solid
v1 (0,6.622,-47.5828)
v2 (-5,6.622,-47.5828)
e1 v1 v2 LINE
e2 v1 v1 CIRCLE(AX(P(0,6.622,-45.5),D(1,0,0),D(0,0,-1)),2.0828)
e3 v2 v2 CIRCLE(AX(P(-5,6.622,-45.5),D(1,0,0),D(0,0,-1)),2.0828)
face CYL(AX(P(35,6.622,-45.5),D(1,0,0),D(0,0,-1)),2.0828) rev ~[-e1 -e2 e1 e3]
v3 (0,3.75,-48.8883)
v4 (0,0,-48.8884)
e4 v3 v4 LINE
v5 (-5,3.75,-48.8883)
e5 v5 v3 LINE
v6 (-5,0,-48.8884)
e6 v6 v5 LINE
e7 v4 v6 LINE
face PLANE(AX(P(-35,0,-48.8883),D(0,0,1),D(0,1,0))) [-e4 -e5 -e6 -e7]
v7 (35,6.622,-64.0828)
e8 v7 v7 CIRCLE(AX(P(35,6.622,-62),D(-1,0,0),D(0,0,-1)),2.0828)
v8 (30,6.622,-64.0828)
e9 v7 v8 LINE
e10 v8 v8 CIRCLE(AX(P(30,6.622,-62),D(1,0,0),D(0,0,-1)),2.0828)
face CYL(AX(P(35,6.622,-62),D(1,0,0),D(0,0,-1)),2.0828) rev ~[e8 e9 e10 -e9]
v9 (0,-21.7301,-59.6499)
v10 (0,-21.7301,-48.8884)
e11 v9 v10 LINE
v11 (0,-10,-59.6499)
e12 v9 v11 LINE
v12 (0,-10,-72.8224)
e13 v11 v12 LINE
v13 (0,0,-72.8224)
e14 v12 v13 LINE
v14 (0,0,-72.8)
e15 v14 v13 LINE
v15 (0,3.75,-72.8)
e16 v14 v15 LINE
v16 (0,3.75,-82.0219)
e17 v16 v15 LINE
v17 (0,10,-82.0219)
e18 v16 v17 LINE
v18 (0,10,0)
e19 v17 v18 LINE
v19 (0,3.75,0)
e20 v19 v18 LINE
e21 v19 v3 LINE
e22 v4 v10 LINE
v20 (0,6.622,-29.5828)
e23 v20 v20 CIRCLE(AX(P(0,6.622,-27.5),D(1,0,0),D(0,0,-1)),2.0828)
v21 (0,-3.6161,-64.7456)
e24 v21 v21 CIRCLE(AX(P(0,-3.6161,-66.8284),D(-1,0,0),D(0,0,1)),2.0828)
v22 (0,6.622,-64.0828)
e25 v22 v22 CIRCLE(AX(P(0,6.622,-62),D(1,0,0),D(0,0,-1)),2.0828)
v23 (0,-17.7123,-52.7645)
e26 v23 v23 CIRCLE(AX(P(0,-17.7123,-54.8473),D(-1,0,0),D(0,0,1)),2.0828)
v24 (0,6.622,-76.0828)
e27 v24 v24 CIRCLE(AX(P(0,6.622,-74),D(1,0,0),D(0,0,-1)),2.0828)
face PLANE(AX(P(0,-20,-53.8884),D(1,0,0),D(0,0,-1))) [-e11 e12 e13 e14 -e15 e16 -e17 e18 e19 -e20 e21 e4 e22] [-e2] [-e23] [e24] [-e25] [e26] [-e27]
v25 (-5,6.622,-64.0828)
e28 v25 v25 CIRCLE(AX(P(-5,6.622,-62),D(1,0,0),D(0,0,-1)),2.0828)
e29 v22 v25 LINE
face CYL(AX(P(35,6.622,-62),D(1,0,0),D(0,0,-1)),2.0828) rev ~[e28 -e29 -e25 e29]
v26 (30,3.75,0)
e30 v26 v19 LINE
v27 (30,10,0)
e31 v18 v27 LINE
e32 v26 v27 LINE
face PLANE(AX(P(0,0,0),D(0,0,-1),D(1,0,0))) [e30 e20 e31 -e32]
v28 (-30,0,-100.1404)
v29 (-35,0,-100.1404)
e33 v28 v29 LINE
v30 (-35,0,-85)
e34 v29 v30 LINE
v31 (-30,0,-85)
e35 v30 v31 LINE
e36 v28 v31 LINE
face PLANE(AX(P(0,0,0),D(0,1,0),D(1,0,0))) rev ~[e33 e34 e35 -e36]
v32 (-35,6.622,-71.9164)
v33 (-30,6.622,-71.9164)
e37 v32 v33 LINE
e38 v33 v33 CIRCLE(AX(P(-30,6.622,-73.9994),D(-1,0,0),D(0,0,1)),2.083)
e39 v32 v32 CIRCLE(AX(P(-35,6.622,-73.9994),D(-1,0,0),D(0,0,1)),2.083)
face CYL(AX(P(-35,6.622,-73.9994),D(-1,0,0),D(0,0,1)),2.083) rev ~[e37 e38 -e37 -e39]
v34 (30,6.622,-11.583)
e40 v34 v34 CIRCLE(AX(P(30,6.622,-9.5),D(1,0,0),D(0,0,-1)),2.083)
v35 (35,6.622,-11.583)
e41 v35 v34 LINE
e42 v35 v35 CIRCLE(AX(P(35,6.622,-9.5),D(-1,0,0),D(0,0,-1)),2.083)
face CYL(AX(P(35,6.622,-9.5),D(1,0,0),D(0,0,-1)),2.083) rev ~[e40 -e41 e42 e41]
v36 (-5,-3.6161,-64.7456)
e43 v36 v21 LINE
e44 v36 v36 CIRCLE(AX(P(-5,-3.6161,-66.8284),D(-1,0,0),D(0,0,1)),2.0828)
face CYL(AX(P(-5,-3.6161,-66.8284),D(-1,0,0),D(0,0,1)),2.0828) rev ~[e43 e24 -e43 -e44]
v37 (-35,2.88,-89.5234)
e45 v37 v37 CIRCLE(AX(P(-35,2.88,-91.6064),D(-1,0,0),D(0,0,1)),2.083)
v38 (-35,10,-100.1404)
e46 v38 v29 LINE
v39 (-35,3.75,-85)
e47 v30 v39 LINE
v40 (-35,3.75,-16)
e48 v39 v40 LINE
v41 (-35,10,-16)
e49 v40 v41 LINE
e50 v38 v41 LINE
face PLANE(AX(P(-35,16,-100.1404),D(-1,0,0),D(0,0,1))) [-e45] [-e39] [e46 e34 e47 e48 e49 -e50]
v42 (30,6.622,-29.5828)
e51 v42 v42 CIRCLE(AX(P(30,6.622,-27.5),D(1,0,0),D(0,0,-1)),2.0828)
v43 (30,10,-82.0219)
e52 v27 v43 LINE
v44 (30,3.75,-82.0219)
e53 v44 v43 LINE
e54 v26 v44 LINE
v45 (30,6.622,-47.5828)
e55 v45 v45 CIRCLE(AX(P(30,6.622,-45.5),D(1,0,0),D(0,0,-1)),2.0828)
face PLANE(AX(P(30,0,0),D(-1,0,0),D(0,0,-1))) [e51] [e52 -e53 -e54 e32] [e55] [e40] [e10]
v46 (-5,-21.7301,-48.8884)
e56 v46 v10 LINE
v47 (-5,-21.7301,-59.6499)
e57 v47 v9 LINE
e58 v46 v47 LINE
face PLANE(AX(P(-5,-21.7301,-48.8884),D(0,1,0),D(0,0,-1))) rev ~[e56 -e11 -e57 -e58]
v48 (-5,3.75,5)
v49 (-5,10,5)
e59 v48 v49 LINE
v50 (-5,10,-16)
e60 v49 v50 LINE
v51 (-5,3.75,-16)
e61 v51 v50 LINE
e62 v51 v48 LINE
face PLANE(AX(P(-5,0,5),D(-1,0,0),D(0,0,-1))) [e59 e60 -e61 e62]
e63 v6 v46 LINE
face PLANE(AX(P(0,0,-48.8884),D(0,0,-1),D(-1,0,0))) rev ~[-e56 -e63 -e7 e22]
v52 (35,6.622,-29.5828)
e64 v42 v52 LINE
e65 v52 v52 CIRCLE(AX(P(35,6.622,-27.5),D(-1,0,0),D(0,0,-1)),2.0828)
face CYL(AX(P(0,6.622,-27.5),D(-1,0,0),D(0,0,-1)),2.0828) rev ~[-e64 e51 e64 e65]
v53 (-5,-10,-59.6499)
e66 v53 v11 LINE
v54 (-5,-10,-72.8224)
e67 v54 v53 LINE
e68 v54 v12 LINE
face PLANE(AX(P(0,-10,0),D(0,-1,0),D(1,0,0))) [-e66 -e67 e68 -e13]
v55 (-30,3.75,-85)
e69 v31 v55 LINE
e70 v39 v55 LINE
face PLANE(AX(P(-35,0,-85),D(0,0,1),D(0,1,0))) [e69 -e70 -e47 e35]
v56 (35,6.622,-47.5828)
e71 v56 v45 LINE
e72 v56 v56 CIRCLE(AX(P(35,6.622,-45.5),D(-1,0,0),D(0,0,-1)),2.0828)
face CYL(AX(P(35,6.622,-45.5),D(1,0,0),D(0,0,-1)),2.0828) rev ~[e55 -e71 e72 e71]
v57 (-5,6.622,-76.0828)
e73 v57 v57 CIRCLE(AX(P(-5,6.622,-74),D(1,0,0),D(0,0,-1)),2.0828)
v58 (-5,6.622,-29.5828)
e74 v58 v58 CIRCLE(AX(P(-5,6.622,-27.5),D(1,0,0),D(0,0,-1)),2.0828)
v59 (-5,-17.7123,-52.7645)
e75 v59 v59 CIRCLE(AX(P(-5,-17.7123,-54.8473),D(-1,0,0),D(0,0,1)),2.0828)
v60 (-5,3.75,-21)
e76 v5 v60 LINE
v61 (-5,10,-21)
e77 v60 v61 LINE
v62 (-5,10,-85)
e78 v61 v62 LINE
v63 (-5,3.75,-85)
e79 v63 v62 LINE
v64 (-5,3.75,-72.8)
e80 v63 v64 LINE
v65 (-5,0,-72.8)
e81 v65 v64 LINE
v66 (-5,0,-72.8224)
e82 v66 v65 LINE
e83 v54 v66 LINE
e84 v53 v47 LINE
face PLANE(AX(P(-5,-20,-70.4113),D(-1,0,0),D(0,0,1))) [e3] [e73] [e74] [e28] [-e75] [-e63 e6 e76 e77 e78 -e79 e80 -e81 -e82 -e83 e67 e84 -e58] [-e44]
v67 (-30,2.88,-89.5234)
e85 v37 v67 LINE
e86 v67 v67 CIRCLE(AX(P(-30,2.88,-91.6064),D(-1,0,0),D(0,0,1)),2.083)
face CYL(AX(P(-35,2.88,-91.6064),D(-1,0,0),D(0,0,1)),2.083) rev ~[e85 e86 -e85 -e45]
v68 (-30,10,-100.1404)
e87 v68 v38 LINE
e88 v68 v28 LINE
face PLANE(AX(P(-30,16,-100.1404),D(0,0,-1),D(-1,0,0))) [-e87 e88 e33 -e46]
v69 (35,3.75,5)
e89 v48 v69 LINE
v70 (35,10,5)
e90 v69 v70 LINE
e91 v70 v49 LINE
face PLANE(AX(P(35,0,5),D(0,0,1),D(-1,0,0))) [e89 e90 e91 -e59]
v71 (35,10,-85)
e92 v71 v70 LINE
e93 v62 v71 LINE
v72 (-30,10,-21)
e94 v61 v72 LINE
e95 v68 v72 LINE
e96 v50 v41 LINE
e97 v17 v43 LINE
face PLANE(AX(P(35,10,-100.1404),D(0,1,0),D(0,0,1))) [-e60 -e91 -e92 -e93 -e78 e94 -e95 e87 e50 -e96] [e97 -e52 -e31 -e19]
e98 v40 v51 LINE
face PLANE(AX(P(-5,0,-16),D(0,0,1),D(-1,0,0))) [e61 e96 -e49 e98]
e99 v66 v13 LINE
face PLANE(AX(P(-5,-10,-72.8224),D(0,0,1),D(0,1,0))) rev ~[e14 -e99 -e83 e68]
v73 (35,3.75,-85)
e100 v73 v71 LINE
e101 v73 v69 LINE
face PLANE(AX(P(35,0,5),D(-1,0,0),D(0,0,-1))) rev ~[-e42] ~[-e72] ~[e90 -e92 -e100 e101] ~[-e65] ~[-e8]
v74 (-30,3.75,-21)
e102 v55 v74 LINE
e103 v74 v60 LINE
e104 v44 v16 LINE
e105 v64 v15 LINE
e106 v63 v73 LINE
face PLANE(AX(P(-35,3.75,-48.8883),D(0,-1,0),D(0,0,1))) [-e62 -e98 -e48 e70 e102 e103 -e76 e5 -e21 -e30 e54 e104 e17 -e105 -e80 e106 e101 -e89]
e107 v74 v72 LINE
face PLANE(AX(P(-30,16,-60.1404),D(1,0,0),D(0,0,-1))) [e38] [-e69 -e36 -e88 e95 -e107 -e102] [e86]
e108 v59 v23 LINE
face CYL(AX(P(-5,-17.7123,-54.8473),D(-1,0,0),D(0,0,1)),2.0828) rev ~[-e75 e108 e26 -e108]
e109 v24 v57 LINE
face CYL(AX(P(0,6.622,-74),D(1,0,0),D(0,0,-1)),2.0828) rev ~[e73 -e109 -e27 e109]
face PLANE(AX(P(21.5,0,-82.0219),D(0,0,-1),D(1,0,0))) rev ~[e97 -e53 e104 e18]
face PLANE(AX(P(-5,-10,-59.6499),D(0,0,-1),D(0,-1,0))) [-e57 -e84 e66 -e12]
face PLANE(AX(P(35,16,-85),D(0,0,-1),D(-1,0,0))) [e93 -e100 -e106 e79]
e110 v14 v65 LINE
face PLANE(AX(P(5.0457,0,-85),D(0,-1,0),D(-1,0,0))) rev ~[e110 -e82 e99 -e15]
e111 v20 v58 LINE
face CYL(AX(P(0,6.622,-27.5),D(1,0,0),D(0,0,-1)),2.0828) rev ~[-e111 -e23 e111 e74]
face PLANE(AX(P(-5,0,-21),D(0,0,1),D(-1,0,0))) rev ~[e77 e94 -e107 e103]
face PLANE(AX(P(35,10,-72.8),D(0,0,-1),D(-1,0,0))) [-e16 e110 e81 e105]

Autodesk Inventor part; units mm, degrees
ref_plane "YZ Plane" through (0, 0, 0) normal (1, 0, 0) x (0, 1, 0)
ref_plane "XZ Plane" through (0, 0, 0) normal (0, 1, 0) x (-1, 0, 0)
ref_plane "XY Plane" through (0, 0, 0) normal (0, 0, 1) x (1, 0, 0)
sketch "Sketch1" plane through (0, 0, 0) normal (0, 1, 0) x (-1, 0, 0)
  line L0 (0, 0) -> (-30, 0)
  line L1 (-30, 0) -> (-30, -80)
  line L2 (0, 0) -> (0, -21)
  line L3 (0, -21) -> (30, -21)
  line L4 (30, -21) -> (30, -80)
  line L5 (30, -80) -> (30, -112)
  line L6 (30, -112) -> (8.74, -112)
  line L7 (8.74, -112) -> (8.74, -80)
  line L8 (8.74, -80) -> (-30, -80)
  line L9 (-35, 5) -> (-35, -85)
  line L10 (-35, -85) -> (3.74, -85)
  line L11 (3.74, -85) -> (3.74, -117)
  line L12 (-35, 5) -> (5, 5)
  line L13 (5, 5) -> (5, -16)
  line L14 (5, -16) -> (35, -16)
  line L15 (35, -16) -> (35, -117)
  line L16 (35, -117) -> (3.74, -117)
  line L17 (0, -21) -> (5, -21)
  line L18 (0, -21) -> (5, -21)
  line L19 (5, -21) -> (5, -80)
  line L20 (0, -21) -> (0, -80)
  dimension "d0" = 30
  dimension "d2" = 21
  dimension "d3" = 30
  dimension "d4" = 59
  dimension "d5" = 32
  dimension "d6" = 21.26
  dimension "d9" = 90
  dimension "d10" = 38.74
  dimension "d11" = 32
  dimension "d12" = 40
  dimension "d13" = 21
  dimension "d14" = 30
extrude "Extrusion1" add sketch "Sketch1" along normal blind 16 contours L3 L19 L8 L20 | L12 L13 L14 L15 L16 L11 L10 L9
sketch "Sketch2" plane through (0, 16, 0) normal (0, 1, 0) x (1, 0, 0)
  line L0 (35, -5) -> (35, 85) projected
  line L1 (35, 85) -> (-46.5269, 85)
  line L2 (-46.5269, 85) -> (-46.5269, 122.3541)
  line L3 (-46.5269, 122.3541) -> (35, 122.3541)
  line L4 (35, 122.3541) -> (35, 85)
  point P0 (0, 0)
extrude "Extrusion2" cut sketch "Sketch2" against normal blind 16
sketch "Sketch3" plane through (0, 16, 0) normal (0, 1, 0) x (1, 0, 0)
  line L0 (-5, 21) -> (-5, 80) projected
  line L1 (-5, 78.0031) -> (-14.0245, 78.0031)
  line L2 (-14.0245, 78.0031) -> (-14.0245, 94.0311)
  line L3 (-14.0245, 94.0311) -> (-5, 94.0311)
  line L4 (-5, 94.0311) -> (-5, 78.0031)
  point P0 (0, 0)
extrude "Extrusion3" cut sketch "Sketch3" against normal blind 16
sketch "Sketch5" plane through (35, 0, 5) normal (1, 0, 0) x (0, 0, -1)
  line L0 (0, 0) -> (90, 0) projected
  line L1 (0, 0) -> (9.5, 0)
  line L2 (9.5, 0) -> (9.5, 6.622)
  line L3 (9.5, 0) -> (14.5, 0)
  line L4 (14.5, 0) -> (14.5, 6.622)
  circle A0 centre (14.5, 6.622) radius 2.083
  point P0 (5, 0)
  dimension "d21" = 9.5
  dimension "d23" = 5
  dimension "d24" = 6.622
  dimension "d25" = 4.166
extrude "Extrusion4" cut sketch "Sketch5" against normal blind 16
sketch "Sketch6" plane through (0, 0, -80) normal (1, 0, 0) x (0, 0, -1)
  circle A0 centre (-70.5, 6.622) radius 2.083 projected
  line L0 (-70.5, 6.622) -> (-52.5, 6.622)
  circle A1 centre (-52.5, 6.622) radius 2.0828
  point P0 (-80, 0)
  dimension "d29" = 18
  dimension "d30" = 4.1656
extrude "Extrusion5" cut sketch "Sketch6" along normal blind 50 and the other way blind 25 contours A1
sketch "Sketch7" plane through (35, 0, 5) normal (1, 0, 0) x (0, 0, -1)
  circle A0 centre (32.5, 6.622) radius 2.0828 projected
  line L0 (32.5, 6.622) -> (50.5, 6.622)
  line L1 (50.5, 6.622) -> (67, 6.622)
  circle A1 centre (50.5, 6.622) radius 2.0828
  circle A2 centre (67, 6.622) radius 2.0828
  point P0 (5, 0)
  dimension "d37" = 18
  dimension "d38" = 16.5
  dimension "d39" = 4.1656
  dimension "d40" = 4.1656
extrude "Extrusion6" cut sketch "Sketch7" against normal blind 50 contours A1 L1 L0 | L0 L1 A1 | A2
sketch "Sketch9" plane through (0, 0, -80) normal (1, 0, 0) x (0, 0, -1)
  circle A0 centre (-18, 6.622) radius 2.0828 projected
  line L0 (-18, 6.622) -> (-6, 6.622)
  circle A1 centre (-6, 6.622) radius 2.0828
  point P0 (-80, 0)
  dimension "d43" = 12
  dimension "d44" = 4.1656
extrude "Extrusion7" cut sketch "Sketch9" against normal blind 10 contours A1
sketch "Sketch10" plane through (0, 0, 0) normal (0, -1, 0) x (1, 0, 0)
  line L0 (0, -80.0219) -> (8.5, -80.0219)
  line L1 (8.5, -80.0219) -> (8.5, -82.0219)
  line L2 (8.5, -82.0219) -> (0, -82.0219)
  line L3 (0, -82.0219) -> (0, -80.0219)
  line L4 (8.5, -80.0219) -> (11.5, -80.0219)
  line L5 (11.5, -80.0219) -> (11.5, -82.0219)
  line L6 (11.5, -82.0219) -> (8.5, -82.0219)
  line L7 (8.5, -82.0219) -> (8.5, -80.0219)
  line L8 (8.5, -80.0219) -> (11.5, -80.0219)
  line L9 (11.5, -80.0219) -> (11.5, -75.0982)
  line L10 (11.5, -75.0982) -> (8.5, -75.0982)
  line L11 (8.5, -75.0982) -> (8.5, -80.0219)
  line L12 (30, 0) -> (30, -80) projected
  line L13 (30, -80) -> (21.5, -80)
  line L14 (21.5, -80) -> (21.5, -82.0219)
  line L15 (21.5, -82.0219) -> (30, -82.0219)
  line L16 (30, -82.0219) -> (30, -80)
  line L17 (21.5, -82.0219) -> (17, -82.0219)
  line L18 (17, -82.0219) -> (17, -71.2839)
  line L19 (17, -71.2839) -> (21.5, -71.2839)
  line L20 (21.5, -71.2839) -> (21.5, -82.0219)
  point P0 (0, 0)
  dimension "d47" = 8.5
  dimension "d48" = 2
  dimension "d49" = 3
  dimension "d50" = 8.5
  dimension "d51" = 4.5
extrude "Extrusion8" cut sketch "Sketch10" against normal blind 100 contours L14 L17 L18 L19 L20
sketch "Sketch11" plane through (0, 16, 0) normal (0, 1, 0) x (1, 0, 0)
  line L0 (-38.388, 86.2009) -> (-26.8829, 86.2009)
  line L1 (-26.8829, 86.2009) -> (-26.8829, 63.045)
  line L2 (-26.8829, 63.045) -> (-38.388, 63.045)
  line L3 (-38.388, 63.045) -> (-38.388, 86.2009)
  point P0 (0, 0)
extrude "Extrusion9" cut sketch "Sketch11" against normal blind 100
sketch "Sketch12" plane through (0, 0, 0) normal (0, -1, 0) x (1, 0, 0)
  line L0 (17, -80) -> (0, -80) projected
  line L1 (17, -82.0219) -> (17, -80)
  line L2 (17, -80) -> (0, -80)
  line L3 (0, -80) -> (0, -82.0219)
  line L4 (21.5, -82.0219) -> (17, -82.0219) projected
  line L5 (0, -82.0219) -> (17, -82.0219)
  point P0 (0, 0)
extrude "Extrusion10" cut sketch "Sketch12" against normal blind 16000
sketch "Sketch13" plane through (0, 0, 0) normal (0, -1, 0) x (1, 0, 0)
  line L0 (30, -80) -> (21.5, -80) projected
  line L1 (30, -80) -> (21.5, -80)
  line L2 (21.5, -80) -> (21.5, -82.0219) projected
  line L3 (21.5, -80) -> (21.5, -82.0219)
  line L4 (21.5, -82.0219) -> (30, -82.0219)
  line L5 (30, -82.0219) -> (30, -80)
  point P0 (0, 0)
extrude "Extrusion11" cut sketch "Sketch13" against normal blind 16000
sketch "Sketch14" plane through (0, 0, 0) normal (0, -1, 0) x (1, 0, 0)
  line L0 (-37.2661, -60.1404) -> (-28.1164, -60.1404)
  line L1 (-28.1164, -60.1404) -> (-28.1164, -64.2388)
  line L2 (-28.1164, -64.2388) -> (-37.2661, -64.2388)
  line L3 (-37.2661, -64.2388) -> (-37.2661, -60.1404)
  point P0 (0, 0)
extrude "Extrusion12" cut sketch "Sketch14" against normal blind 10000
sketch "Sketch15" plane through (0, 0, 0) normal (0, -1, 0) x (1, 0, 0)
  line L0 (-5, -85) -> (-5, -21) projected
  line L1 (0, 0) -> (0, -82.0219) projected
  line L2 (-5, -47.0884) -> (0, -47.0884)
  line L3 (0, -47.0884) -> (0, -60.3662)
  line L4 (0, -60.3662) -> (-5, -60.3662)
  line L5 (-5, -60.3662) -> (-5, -47.0884)
extrude "Extrusion13" add sketch "Sketch15" along normal blind 10
sketch "Sketch16" plane through (0, -10, 0) normal (0, -1, 0) x (1, 0, 0)
  line L0 (0, -47.0884) -> (-5, -47.0884) projected
  line L1 (0, 0) -> (0, -82.0219) projected
  line L2 (-5, -47.0884) -> (0, -47.0884)
  line L3 (0, -47.0884) -> (0, -53.8884)
  line L4 (0, -53.8884) -> (-5, -53.8884)
  line L5 (-5, -53.8884) -> (-5, -47.0884)
  line L6 (0, -82.0219) -> (0, -60.3662) projected
  line L7 (-5, -53.8884) -> (0, -53.8884)
  line L8 (0, -53.8884) -> (0, -68.0271)
  line L9 (0, -68.0271) -> (-5, -68.0271)
  line L10 (-5, -68.0271) -> (-5, -53.8884)
  dimension "d64" = 6.8
extrude "Extrusion14" add sketch "Sketch16" along normal mid plane 20 contours L1 L9 L10 L4
sketch "Sketch17" plane through (0, -10, 0) normal (0, -1, 0) x (1, 0, 0)
  line L0 (0, -47.0884) -> (-5, -47.0884) projected
  line L1 (0, -53.8884) -> (0, -47.0884) projected
  line L2 (-5, -47.0884) -> (0, -47.0884)
  line L3 (0, -47.0884) -> (0, -53.8884)
  line L4 (0, -53.8884) -> (-5, -53.8884)
  line L5 (-5, -53.8884) -> (-5, -47.0884)
  point P0 (0, 0)
extrude "Extrusion15" cut sketch "Sketch17" against normal blind 10
sketch "Sketch18" plane through (0, -20, 0) normal (0, -1, 0) x (1, 0, 0)
  line L0 (-5, -53.8884) -> (-5, -68.0271) projected
  line L1 (0, -71.9172) -> (0, -76.0828) projected
  line L2 (-5, -68.0271) -> (0, -68.0271)
  line L3 (0, -68.0271) -> (0, -76.0828)
  line L4 (0, -76.0828) -> (-5, -76.0828)
  line L5 (-5, -76.0828) -> (-5, -68.0271)
  point P0 (0, 0)
extrude "Extrusion16" add sketch "Sketch18" against normal blind 20
sketch "Sketch19" plane through (0, -20, 0) normal (0, -1, 0) x (1, 0, 0)
  line L0 (-5, -76.0828) -> (-5, -85) projected
  line L1 (0, -53.8884) -> (0, -76.0828) projected
  line L2 (-5, -76.0828) -> (0, -76.0828)
  line L3 (0, -76.0828) -> (0, -70.4113)
  line L4 (0, -70.4113) -> (-5, -70.4113)
  line L5 (-5, -70.4113) -> (-5, -76.0828)
  point P0 (0, 0)
extrude "Extrusion17" cut sketch "Sketch19" against normal blind 10
sketch "Sketch20" plane through (-5, 0, -21) normal (-1, 0, 0) x (0, 0, 1)
  line L0 (-55.0828, -10) -> (-49.4113, -10) projected
  line L1 (21, 0) -> (-61.0219, 0) projected
  line L2 (-55.0828, -10) -> (-51.8224, -10)
  line L3 (-51.8224, -10) -> (-51.8224, 0)
  line L4 (-51.8224, 0) -> (-55.0828, 0)
  line L5 (-55.0828, 0) -> (-55.0828, -10)
extrude "Extrusion18" cut sketch "Sketch20" against normal blind 10
sketch "Sketch21" plane through (-5, 0, -21) normal (-1, 0, 0) x (0, 0, 1)
  circle A0 centre (-53, 6.622) radius 2.0828 projected
  line L0 (-53, 6.622) -> (-45.8284, -3.6161)
  circle A1 centre (-45.8284, -3.6161) radius 2.0828
  point P0 (21, 0)
  dimension "d75" = 12.5
  dimension "d76" = 4.1656
extrude "Extrusion19" cut sketch "Sketch21" against normal blind 20 contours A1
sketch "Sketch22" plane through (-5, 0, -21) normal (-1, 0, 0) x (0, 0, 1)
  circle A0 centre (-45.8284, -3.6161) radius 2.0828 projected
  line L0 (-45.8284, -3.6161) -> (-33.8473, -17.7123)
  circle A1 centre (-33.8473, -17.7123) radius 2.0828
  point P0 (21, 0)
  dimension "d79" = 18.5
  dimension "d86" = 4.1656
sketch "Sketch23" plane through (0, 0, 0) normal (0, -1, 0) x (1, 0, 0)
  line L0 (-5, -53.8884) -> (0, -53.8884)
  line L1 (0, -53.8884) -> (0, -48.8884)
  line L2 (0, -48.8884) -> (-5, -48.8884)
  line L3 (-5, -48.8884) -> (-5, -53.8884)
  point P0 (0, 0)
  dimension "d80" = 5
  dimension "d81" = 5
extrude "Extrusion20" add sketch "Sketch23" along normal blind 24
sketch "Sketch24" plane through (0, -20, 0) normal (0, -1, 0) x (1, 0, 0)
  line L0 (0, -53.8884) -> (-5, -53.8884) projected
  line L1 (-5, -70.4113) -> (0, -70.4113) projected
  line L2 (-5, -53.8884) -> (0, -53.8884)
  line L3 (0, -53.8884) -> (0, -70.4113)
  line L4 (0, -70.4113) -> (-5, -70.4113)
  line L5 (-5, -70.4113) -> (-5, -53.8884)
  point P0 (0, 0)
extrude "Extrusion21" add sketch "Sketch24" along normal blind 4
extrude "Extrusion22" cut sketch "Sketch22" against normal blind 10 contours A1
sketch "Sketch25" plane through (-5, 0, -21) normal (-1, 0, 0) x (0, 0, 1)
  line L0 (-49.4113, -10) -> (-49.4113, -24) projected
  line L1 (-27.8884, 0) -> (-27.8884, -24) projected
  line L2 (-49.4113, -24) -> (-27.8884, -24)
  line L3 (-27.8884, -24) -> (-27.8884, -21.7301)
  line L4 (-27.8884, -21.7301) -> (-49.4113, -21.7301)
  line L5 (-49.4113, -21.7301) -> (-49.4113, -24)
  point P0 (21, 0)
extrude "Extrusion23" cut sketch "Sketch25" against normal blind 10
sketch "Sketch26" plane through (0, 16, 0) normal (0, 1, 0) x (1, 0, 0)
  line L0 (-35, 60.1404) -> (-30, 60.1404) projected
  line L1 (-35, 60.1404) -> (-30, 60.1404)
  line L2 (-30, 60.1404) -> (-30, 100.1404)
  line L3 (-30, 100.1404) -> (-35, 100.1404)
  line L4 (-35, 100.1404) -> (-35, 60.1404)
  point P0 (0, 0)
  dimension "d91" = 40
extrude "Extrusion24" add sketch "Sketch26" against normal blind 16
sketch "Sketch29" plane through (35, 0, 5) normal (1, 0, 0) x (0, 0, -1)
  line L0 (0, 16) -> (90, 16) projected
  line L1 (105.1404, 16) -> (105.1404, 0) projected
  line L2 (0, 16) -> (105.1404, 16)
  line L3 (105.1404, 16) -> (105.1404, 10)
  line L4 (105.1404, 10) -> (0, 10)
  line L5 (0, 10) -> (0, 16)
  line L6 (0, 0) -> (90, 0) projected
  point P0 (5, 0)
  dimension "d101" = 10
extrude "Extrusion27" cut sketch "Sketch29" against normal blind 70
sketch "Sketch30" plane through (-35, 0, -100.1404) normal (-1, 0, 0) x (0, 0, 1)
  line L0 (105.1404, 0) -> (15.1404, 0) projected
  line L1 (105.1404, 0) -> (51.2521, 0)
  line L2 (51.2521, 0) -> (51.2521, 3.75)
  line L3 (51.2521, 3.75) -> (105.1404, 3.75)
  line L4 (105.1404, 3.75) -> (105.1404, 0)
  line L5 (51.2521, 0) -> (51.2521, -21.7301) projected
  point P0 (100.1404, 0)
  dimension "d104" = 3.75
  dimension "d115" = 0
extrude "Extrusion28" cut sketch "Sketch30" against normal blind 70
sketch "Sketch31" plane through (35, 0, -85) normal (1, 0, 0) x (0, 0, -1)
  line L0 (-36.1116, 3.75) -> (-64, 3.75) projected
  line L1 (-36.1116, 0) -> (0, 0) projected
  line L2 (-36.1116, 3.75) -> (0, 3.75)
  line L3 (0, 3.75) -> (0, 0)
  line L4 (0, 0) -> (-36.1116, 0)
  line L5 (-36.1116, 0) -> (-36.1116, 3.75)
  point P0 (-85, 0)
extrude "Extrusion29" cut sketch "Sketch31" against normal blind 30
sketch "Sketch32" plane through (35, 10, -85) normal (0, 0, -1) x (-1, 0, 0)
  line L0 (40, -6.25) -> (35, -6.25) projected
  line L1 (29.9543, -10) -> (40, -10)
  line L2 (40, -10) -> (40, -6.25)
  line L3 (40, -6.25) -> (29.9543, -6.25)
  line L4 (29.9543, -6.25) -> (29.9543, -10)
  point P0 (35, -10)
extrude "Extrusion30" cut sketch "Sketch32" against normal blind 12.2
sketch "Sketch33" plane through (-5, -10, -72.8224) normal (-1, 0, 0) x (0, 0, 1)
  line L0 (2.4111, 0) -> (2.4111, -11.7301) projected
  line L1 (23.934, -11.7301) -> (2.4111, -11.7301) projected
  line L2 (2.4111, 0) -> (13.1725, 0)
  line L3 (13.1725, 0) -> (13.1725, -11.7301)
  line L4 (13.1725, -11.7301) -> (2.4111, -11.7301)
  line L5 (2.4111, -11.7301) -> (2.4111, 0)
  point P0 (72.8224, 10)
extrude "Extrusion31" cut sketch "Sketch33" against normal blind 12.2
sketch "Sketch35" plane through (-35, 0, -100.1404) normal (-1, 0, 0) x (0, 0, 1)
  line L0 (18.1185, 3.75) -> (100.1404, 3.75) projected
  line L1 (52.6043, 3.75) -> (49.8728, 3.75)
  line L2 (49.8728, 3.75) -> (49.8728, 0)
  line L3 (49.8728, 0) -> (52.6043, 0)
  line L4 (52.6043, 0) -> (52.6043, 3.75)
  point P0 (100.1404, 0)
extrude "Extrusion33" cut sketch "Sketch35" against normal blind 5
sketch "Sketch36" plane through (-35, 0, -100.1404) normal (-1, 0, 0) x (0, 0, 1)
  circle A0 centre (26.141, 6.622) radius 2.083
  line L0 (0, 10) -> (0, 0) projected
  line L1 (49.8728, 3.75) -> (84.1404, 3.75) projected
  point P0 (100.1404, 0)
  point P1 (15.1404, 3.75)
  dimension "d118" = 4.166
  dimension "d119" = 26.141
  dimension "d120" = 2.872
extrude "Extrusion34" cut sketch "Sketch36" against normal blind 10
sketch "Sketch37" plane through (-35, 0, -100.1404) normal (-1, 0, 0) x (0, 0, 1)
  line L0 (49.8728, 0) -> (49.8728, 3.75) projected
  line L1 (15.1404, 3.75) -> (15.1404, 10) projected
  line L2 (49.8728, 0) -> (15.1404, 0)
  line L3 (15.1404, 0) -> (15.1404, 3.75)
  line L4 (15.1404, 3.75) -> (49.8728, 3.75)
  line L5 (49.8728, 3.75) -> (49.8728, 0)
  point P0 (100.1404, 0)
extrude "Extrusion35" cut sketch "Sketch37" against normal blind 5
sketch "Sketch39" plane through (-35, 0, -100.1404) normal (-1, 0, 0) x (0, 0, 1)
  circle A0 centre (8.534, 2.88) radius 2.083
  line L0 (0, 10) -> (0, 0) projected
  line L1 (0, 0) -> (15.1404, 0) projected
  point P0 (100.1404, 0)
  dimension "d131" = 4.166
  dimension "d132" = 6.451
  dimension "d133" = 2.88
extrude "Extrusion37" cut sketch "Sketch39" against normal blind 5
properties part number "Mounting bracket"
